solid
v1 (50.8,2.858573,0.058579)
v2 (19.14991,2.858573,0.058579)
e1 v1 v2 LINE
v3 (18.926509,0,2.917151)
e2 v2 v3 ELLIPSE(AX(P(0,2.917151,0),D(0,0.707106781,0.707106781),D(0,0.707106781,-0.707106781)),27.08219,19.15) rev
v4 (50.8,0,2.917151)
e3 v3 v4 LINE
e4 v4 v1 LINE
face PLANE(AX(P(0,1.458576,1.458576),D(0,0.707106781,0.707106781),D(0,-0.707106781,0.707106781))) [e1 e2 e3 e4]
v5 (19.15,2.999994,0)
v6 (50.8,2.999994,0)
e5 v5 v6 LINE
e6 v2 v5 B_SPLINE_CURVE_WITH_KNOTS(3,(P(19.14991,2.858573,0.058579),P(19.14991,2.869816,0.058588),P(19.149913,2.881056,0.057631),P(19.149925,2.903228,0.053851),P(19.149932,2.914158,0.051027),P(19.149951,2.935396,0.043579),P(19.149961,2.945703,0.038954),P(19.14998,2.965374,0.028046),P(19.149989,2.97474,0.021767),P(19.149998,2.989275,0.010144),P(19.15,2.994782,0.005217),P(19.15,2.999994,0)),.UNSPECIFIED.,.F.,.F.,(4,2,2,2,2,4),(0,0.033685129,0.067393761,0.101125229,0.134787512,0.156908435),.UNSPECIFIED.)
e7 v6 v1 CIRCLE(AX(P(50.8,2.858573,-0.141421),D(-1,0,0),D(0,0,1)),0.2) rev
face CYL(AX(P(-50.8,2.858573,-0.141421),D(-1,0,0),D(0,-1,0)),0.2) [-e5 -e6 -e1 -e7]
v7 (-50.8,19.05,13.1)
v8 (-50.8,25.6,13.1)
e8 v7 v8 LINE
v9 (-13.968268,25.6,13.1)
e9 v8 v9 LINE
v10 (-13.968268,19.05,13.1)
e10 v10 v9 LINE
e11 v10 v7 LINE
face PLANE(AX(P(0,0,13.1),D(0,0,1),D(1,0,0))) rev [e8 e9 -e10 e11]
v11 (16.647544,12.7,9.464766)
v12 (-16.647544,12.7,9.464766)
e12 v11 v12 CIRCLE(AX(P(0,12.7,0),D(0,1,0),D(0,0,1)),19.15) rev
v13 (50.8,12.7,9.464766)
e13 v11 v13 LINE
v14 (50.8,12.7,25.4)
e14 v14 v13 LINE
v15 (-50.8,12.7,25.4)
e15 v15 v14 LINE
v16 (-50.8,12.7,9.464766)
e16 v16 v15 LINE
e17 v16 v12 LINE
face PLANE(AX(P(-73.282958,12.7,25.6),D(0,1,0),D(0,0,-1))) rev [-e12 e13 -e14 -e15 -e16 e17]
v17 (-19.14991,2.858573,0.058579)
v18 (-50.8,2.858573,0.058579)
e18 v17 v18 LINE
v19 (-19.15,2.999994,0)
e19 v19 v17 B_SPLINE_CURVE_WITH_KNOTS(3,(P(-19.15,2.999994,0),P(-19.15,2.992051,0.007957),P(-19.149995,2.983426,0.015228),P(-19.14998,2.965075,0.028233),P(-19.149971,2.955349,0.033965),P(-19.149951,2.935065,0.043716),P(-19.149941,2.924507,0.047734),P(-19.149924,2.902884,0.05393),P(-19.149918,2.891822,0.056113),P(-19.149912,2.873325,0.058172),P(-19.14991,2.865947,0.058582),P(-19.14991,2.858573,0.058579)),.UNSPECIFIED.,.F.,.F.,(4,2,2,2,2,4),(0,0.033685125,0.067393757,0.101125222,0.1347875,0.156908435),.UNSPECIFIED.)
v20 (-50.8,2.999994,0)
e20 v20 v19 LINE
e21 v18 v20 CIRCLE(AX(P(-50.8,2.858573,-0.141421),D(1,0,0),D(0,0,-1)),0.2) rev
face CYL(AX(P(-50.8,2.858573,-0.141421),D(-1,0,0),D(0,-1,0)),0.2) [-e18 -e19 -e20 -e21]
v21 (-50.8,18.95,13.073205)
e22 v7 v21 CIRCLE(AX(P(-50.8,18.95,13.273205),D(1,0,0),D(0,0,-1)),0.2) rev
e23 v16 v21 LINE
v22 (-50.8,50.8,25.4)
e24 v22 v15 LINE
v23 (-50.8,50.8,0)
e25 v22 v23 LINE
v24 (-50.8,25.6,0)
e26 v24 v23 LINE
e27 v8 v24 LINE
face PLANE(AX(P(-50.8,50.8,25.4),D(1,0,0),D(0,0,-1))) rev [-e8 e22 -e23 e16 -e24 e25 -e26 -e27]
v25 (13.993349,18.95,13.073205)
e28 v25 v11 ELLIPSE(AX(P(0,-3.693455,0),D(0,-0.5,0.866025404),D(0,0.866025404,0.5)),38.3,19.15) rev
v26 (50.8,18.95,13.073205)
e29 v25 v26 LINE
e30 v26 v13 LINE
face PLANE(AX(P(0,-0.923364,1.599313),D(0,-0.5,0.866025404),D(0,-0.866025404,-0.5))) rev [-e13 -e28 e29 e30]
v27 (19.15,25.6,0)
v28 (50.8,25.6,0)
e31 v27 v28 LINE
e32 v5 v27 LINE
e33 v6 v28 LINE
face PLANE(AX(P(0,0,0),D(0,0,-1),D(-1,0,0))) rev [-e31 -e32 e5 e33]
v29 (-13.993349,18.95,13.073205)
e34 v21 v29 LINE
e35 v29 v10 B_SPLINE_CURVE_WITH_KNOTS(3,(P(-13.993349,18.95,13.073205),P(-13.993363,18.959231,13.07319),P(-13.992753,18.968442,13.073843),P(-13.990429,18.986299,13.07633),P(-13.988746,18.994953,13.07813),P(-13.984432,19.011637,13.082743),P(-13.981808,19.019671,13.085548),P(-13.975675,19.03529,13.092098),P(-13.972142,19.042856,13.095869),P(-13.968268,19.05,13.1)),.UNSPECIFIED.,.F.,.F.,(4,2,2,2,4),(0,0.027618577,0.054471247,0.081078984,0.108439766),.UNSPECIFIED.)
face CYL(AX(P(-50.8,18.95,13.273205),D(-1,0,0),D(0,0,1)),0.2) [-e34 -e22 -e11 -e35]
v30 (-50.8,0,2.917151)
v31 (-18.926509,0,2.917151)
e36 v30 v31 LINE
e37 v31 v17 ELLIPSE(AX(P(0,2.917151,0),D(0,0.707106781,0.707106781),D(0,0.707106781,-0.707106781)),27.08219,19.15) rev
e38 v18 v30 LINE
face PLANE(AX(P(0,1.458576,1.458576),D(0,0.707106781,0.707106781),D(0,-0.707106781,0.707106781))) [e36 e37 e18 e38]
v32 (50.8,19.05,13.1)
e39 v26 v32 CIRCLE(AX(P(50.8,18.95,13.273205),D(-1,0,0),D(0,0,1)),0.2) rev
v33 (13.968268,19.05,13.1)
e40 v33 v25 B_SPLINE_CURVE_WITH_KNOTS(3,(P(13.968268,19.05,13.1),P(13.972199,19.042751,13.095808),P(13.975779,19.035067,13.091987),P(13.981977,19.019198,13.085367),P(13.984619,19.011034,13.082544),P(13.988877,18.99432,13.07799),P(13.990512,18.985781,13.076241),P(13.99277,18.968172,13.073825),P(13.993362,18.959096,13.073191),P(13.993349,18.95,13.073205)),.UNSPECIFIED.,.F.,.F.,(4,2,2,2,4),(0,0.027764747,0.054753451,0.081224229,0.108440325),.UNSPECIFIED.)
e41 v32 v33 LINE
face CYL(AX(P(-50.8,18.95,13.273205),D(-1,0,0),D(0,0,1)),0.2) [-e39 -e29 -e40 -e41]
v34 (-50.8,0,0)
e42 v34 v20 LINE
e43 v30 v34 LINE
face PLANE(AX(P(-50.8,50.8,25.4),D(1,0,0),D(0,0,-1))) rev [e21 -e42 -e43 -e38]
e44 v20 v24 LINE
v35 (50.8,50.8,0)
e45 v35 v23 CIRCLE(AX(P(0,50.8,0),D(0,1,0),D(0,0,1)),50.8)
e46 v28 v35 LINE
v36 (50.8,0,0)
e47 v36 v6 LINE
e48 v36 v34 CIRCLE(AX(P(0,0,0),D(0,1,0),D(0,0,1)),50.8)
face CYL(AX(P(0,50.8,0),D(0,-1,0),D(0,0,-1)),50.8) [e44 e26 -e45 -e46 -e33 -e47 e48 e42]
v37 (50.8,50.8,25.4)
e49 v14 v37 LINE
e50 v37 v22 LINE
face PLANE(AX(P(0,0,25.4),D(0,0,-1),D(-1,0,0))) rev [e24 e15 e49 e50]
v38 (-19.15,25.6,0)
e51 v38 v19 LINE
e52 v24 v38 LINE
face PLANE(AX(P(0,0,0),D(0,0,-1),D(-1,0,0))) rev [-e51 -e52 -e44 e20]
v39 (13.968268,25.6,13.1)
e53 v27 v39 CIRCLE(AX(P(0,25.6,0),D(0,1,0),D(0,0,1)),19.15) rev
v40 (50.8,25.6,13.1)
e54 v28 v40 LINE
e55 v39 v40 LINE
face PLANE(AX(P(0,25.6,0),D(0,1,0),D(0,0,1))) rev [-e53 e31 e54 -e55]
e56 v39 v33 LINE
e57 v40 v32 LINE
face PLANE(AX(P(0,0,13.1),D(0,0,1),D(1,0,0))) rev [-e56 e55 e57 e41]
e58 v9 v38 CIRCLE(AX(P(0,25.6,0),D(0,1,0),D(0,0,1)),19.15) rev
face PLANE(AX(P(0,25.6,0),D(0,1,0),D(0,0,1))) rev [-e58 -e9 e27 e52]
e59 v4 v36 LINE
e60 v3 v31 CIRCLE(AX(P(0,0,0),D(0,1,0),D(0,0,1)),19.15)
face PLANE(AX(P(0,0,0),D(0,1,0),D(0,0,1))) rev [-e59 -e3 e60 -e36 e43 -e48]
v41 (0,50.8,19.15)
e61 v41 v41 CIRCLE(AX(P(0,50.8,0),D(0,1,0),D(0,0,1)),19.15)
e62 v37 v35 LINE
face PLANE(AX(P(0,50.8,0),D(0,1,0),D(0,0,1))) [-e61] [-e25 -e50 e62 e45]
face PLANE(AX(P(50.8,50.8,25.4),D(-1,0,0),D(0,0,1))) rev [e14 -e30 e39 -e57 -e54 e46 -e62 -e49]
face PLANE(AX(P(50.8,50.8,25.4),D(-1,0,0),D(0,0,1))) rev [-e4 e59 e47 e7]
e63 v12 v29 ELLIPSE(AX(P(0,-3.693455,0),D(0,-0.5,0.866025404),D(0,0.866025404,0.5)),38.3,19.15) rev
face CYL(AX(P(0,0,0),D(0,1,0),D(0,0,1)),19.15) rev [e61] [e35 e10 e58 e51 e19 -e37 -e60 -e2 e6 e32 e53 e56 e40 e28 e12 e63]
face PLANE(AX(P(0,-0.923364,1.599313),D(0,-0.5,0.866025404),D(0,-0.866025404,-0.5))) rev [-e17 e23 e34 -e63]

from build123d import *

# Parameters (mm, degrees)
SKETCH1_R           = 50.8
BOSS_EXTRUDE1_DEPTH = 50.8
SKETCH2_W           = 101.6
SKETCH2_H           = 101.6
CUT_EXTRUDE1_DEPTH  = 50.8
SKETCH3_W           = 101.6
SKETCH3_H           = 50.8
BOSS_EXTRUDE2_DEPTH = 25.4
SKETCH4_R           = 19.150000054
CUT_EXTRUDE2_DEPTH  = 50.8
CAVITY1_START       = -50.8
CAVITY1_DEPTH       = 101.6
SKETCH7_W           = 101.6
SKETCH7_H           = 22.400006
CUT_EXTRUDE3_DEPTH  = 0.2
SKETCH8_W           = 101.6
SKETCH8_H           = 4.242632202
CUT_EXTRUDE4_DEPTH  = 0.2
SKETCH9_W           = 101.6
SKETCH9_H           = 12.9
CUT_EXTRUDE5_DEPTH  = 0.2
SKETCH12_W          = 101.6
SKETCH12_H          = 6.55
CUT_EXTRUDE8_DEPTH  = 0.2
SKETCH13_W          = 101.6
SKETCH13_H          = 7.332348419
CUT_EXTRUDE9_DEPTH  = 0.2
FILLET3_R           = 0.2
FILLET4_R           = 0.2


with BuildPart() as part:
    # Sketch1 → Boss-Extrude1 (new body)
    with BuildSketch(Plane(origin=(0, 0, 0), x_dir=(1, 0, 0), z_dir=(0, 1, 0))):
        with Locations(Location((0, 0, 0), (0, 0, 270))):
            Circle(SKETCH1_R)
    extrude(amount=BOSS_EXTRUDE1_DEPTH)

    # Sketch2 → Cut-Extrude1 (cut)
    with BuildSketch(Plane(origin=(0, 50.8, 0), x_dir=(1, 0, 0), z_dir=(0, 1, 0))):
        with Locations((0, -50.8)):
            Rectangle(SKETCH2_W, SKETCH2_H)
    extrude(amount=-CUT_EXTRUDE1_DEPTH, mode=Mode.SUBTRACT)

    # Sketch3 → Boss-Extrude2 (add)
    with BuildSketch(Plane.XY):
        with Locations((0, 25.4)):
            Rectangle(SKETCH3_W, SKETCH3_H)
    extrude(amount=BOSS_EXTRUDE2_DEPTH)

    # Sketch4 → Cut-Extrude2 (cut)
    with BuildSketch(Plane(origin=(0, 50.8, 0), x_dir=(1, 0, 0), z_dir=(0, 1, 0))):
        with Locations(Location((0, 0, 0), (0, 0, 270))):
            Circle(SKETCH4_R)
    extrude(amount=-CUT_EXTRUDE2_DEPTH, mode=Mode.SUBTRACT)

    # Cavity1: read off the stored shape, not the designer's step
    # Cavity1 outline → Cavity1 (cut)
    with BuildSketch(Plane.YZ.offset(CAVITY1_START)):
        Polygon((19.05, 12.9), (12.7, 9.233825791), (12.7, 25.4), (0, 25.4), (0, 3.199994), (2.999994, 0.2), (25.4, 0.2), (25.4, 12.9), align=None)
    extrude(amount=CAVITY1_DEPTH, mode=Mode.SUBTRACT)

    # Sketch7 → Cut-Extrude3 (cut)
    with BuildSketch(Plane.XY.offset(0.2)):
        with Locations((0, 14.199997)):
            Rectangle(SKETCH7_W, SKETCH7_H)
    extrude(amount=-CUT_EXTRUDE3_DEPTH, mode=Mode.SUBTRACT)

    # Sketch8 → Cut-Extrude4 (cut)
    with BuildSketch(Plane(origin=(0, 1.599997, 1.599997), x_dir=(1, 0, 0), z_dir=(0, 0.7071067811865475, 0.7071067811865477))):
        with Locations((0, -0.141421356)):
            Rectangle(SKETCH8_W, SKETCH8_H)
    extrude(amount=-CUT_EXTRUDE4_DEPTH, mode=Mode.SUBTRACT)

    # Sketch9 → Cut-Extrude5 (cut)
    with BuildSketch(Plane.XZ.offset(-25.4)):
        with Locations((0, 6.45)):
            Rectangle(SKETCH9_W, SKETCH9_H)
    extrude(amount=-CUT_EXTRUDE5_DEPTH, mode=Mode.SUBTRACT)

    # Sketch12 → Cut-Extrude8 (cut)
    with BuildSketch(Plane(origin=(0, 0, 12.9), x_dir=(-1, 0, 0), z_dir=(0, 0, -1))):
        with Locations((0, 22.325)):
            Rectangle(SKETCH12_W, SKETCH12_H)
    extrude(amount=-CUT_EXTRUDE8_DEPTH, mode=Mode.SUBTRACT)

    # Sketch13 → Cut-Extrude9 (cut)
    with BuildSketch(Plane(origin=(0, -0.823363854, 1.426108029), x_dir=(-1, 0, 0), z_dir=(0, 0.4999999999999968, -0.8660254037844406))):
        with Locations((0, 19.281609733)):
            Rectangle(SKETCH13_W, SKETCH13_H)
    extrude(amount=-CUT_EXTRUDE9_DEPTH, mode=Mode.SUBTRACT)

    # Fillet3
    # the kernel refuses this fillet: 0.2 mm, written as the material it takes off along each edge
    with BuildSketch(Plane(origin=(-51.3, 19.05, 12.9), x_dir=(0, -1.0658141036380147e-12, 1.0), z_dir=(1, 0, 0))) as fillet3_piece_1:
        with BuildLine():
            CenterArc((0.373205081, 0.1), FILLET3_R, 180, 30)
            Line((0.173205081, 0.1), (0, 0))
            Line((0, 0), (0.2, 0))
        make_face()
    extrude(amount=37.646820072, mode=Mode.SUBTRACT)
    with BuildSketch(Plane(origin=(13.653179928, 19.05, 12.9), x_dir=(0, -0.4999999999991145, 0.86602540378495), z_dir=(1, 0, 0))) as fillet3_piece_2:
        with BuildLine():
            CenterArc((0.373205081, -0.1), FILLET3_R, 150, 30)
            Line((0.173205081, -0.1), (0, 0))
            Line((0, 0), (0.2, 0))
        make_face()
    extrude(amount=37.646820072, mode=Mode.SUBTRACT)

    # Fillet4
    # the kernel refuses this fillet: 0.2 mm, written as the material it takes off along each edge
    with BuildSketch(Plane(origin=(-51.3, 2.999994, 0.2), x_dir=(0, -1.4543921622385273e-11, -1.0), z_dir=(1, 0, 0))) as fillet4_piece_1:
        with BuildLine():
            CenterArc((0.341421356, -0.141421356), FILLET4_R, 135.000000001, 44.999999999)
            Line((0.141421356, -0.141421356), (0, 0))
            Line((0, 0), (0.2, 0))
        make_face()
    extrude(amount=32.651044361, mode=Mode.SUBTRACT)
    with BuildSketch(Plane(origin=(18.648955639, 2.999994, 0.2), x_dir=(0, -0.7071067811764699, -0.7071067811966253), z_dir=(1, 0, 0))) as fillet4_piece_2:
        with BuildLine():
            CenterArc((0.341421356, 0.141421356), FILLET4_R, 180, 44.999999999)
            Line((0.141421356, 0.141421356), (0, 0))
            Line((0, 0), (0.2, 0))
        make_face()
    extrude(amount=32.651044361, mode=Mode.SUBTRACT)


solid = part.part
